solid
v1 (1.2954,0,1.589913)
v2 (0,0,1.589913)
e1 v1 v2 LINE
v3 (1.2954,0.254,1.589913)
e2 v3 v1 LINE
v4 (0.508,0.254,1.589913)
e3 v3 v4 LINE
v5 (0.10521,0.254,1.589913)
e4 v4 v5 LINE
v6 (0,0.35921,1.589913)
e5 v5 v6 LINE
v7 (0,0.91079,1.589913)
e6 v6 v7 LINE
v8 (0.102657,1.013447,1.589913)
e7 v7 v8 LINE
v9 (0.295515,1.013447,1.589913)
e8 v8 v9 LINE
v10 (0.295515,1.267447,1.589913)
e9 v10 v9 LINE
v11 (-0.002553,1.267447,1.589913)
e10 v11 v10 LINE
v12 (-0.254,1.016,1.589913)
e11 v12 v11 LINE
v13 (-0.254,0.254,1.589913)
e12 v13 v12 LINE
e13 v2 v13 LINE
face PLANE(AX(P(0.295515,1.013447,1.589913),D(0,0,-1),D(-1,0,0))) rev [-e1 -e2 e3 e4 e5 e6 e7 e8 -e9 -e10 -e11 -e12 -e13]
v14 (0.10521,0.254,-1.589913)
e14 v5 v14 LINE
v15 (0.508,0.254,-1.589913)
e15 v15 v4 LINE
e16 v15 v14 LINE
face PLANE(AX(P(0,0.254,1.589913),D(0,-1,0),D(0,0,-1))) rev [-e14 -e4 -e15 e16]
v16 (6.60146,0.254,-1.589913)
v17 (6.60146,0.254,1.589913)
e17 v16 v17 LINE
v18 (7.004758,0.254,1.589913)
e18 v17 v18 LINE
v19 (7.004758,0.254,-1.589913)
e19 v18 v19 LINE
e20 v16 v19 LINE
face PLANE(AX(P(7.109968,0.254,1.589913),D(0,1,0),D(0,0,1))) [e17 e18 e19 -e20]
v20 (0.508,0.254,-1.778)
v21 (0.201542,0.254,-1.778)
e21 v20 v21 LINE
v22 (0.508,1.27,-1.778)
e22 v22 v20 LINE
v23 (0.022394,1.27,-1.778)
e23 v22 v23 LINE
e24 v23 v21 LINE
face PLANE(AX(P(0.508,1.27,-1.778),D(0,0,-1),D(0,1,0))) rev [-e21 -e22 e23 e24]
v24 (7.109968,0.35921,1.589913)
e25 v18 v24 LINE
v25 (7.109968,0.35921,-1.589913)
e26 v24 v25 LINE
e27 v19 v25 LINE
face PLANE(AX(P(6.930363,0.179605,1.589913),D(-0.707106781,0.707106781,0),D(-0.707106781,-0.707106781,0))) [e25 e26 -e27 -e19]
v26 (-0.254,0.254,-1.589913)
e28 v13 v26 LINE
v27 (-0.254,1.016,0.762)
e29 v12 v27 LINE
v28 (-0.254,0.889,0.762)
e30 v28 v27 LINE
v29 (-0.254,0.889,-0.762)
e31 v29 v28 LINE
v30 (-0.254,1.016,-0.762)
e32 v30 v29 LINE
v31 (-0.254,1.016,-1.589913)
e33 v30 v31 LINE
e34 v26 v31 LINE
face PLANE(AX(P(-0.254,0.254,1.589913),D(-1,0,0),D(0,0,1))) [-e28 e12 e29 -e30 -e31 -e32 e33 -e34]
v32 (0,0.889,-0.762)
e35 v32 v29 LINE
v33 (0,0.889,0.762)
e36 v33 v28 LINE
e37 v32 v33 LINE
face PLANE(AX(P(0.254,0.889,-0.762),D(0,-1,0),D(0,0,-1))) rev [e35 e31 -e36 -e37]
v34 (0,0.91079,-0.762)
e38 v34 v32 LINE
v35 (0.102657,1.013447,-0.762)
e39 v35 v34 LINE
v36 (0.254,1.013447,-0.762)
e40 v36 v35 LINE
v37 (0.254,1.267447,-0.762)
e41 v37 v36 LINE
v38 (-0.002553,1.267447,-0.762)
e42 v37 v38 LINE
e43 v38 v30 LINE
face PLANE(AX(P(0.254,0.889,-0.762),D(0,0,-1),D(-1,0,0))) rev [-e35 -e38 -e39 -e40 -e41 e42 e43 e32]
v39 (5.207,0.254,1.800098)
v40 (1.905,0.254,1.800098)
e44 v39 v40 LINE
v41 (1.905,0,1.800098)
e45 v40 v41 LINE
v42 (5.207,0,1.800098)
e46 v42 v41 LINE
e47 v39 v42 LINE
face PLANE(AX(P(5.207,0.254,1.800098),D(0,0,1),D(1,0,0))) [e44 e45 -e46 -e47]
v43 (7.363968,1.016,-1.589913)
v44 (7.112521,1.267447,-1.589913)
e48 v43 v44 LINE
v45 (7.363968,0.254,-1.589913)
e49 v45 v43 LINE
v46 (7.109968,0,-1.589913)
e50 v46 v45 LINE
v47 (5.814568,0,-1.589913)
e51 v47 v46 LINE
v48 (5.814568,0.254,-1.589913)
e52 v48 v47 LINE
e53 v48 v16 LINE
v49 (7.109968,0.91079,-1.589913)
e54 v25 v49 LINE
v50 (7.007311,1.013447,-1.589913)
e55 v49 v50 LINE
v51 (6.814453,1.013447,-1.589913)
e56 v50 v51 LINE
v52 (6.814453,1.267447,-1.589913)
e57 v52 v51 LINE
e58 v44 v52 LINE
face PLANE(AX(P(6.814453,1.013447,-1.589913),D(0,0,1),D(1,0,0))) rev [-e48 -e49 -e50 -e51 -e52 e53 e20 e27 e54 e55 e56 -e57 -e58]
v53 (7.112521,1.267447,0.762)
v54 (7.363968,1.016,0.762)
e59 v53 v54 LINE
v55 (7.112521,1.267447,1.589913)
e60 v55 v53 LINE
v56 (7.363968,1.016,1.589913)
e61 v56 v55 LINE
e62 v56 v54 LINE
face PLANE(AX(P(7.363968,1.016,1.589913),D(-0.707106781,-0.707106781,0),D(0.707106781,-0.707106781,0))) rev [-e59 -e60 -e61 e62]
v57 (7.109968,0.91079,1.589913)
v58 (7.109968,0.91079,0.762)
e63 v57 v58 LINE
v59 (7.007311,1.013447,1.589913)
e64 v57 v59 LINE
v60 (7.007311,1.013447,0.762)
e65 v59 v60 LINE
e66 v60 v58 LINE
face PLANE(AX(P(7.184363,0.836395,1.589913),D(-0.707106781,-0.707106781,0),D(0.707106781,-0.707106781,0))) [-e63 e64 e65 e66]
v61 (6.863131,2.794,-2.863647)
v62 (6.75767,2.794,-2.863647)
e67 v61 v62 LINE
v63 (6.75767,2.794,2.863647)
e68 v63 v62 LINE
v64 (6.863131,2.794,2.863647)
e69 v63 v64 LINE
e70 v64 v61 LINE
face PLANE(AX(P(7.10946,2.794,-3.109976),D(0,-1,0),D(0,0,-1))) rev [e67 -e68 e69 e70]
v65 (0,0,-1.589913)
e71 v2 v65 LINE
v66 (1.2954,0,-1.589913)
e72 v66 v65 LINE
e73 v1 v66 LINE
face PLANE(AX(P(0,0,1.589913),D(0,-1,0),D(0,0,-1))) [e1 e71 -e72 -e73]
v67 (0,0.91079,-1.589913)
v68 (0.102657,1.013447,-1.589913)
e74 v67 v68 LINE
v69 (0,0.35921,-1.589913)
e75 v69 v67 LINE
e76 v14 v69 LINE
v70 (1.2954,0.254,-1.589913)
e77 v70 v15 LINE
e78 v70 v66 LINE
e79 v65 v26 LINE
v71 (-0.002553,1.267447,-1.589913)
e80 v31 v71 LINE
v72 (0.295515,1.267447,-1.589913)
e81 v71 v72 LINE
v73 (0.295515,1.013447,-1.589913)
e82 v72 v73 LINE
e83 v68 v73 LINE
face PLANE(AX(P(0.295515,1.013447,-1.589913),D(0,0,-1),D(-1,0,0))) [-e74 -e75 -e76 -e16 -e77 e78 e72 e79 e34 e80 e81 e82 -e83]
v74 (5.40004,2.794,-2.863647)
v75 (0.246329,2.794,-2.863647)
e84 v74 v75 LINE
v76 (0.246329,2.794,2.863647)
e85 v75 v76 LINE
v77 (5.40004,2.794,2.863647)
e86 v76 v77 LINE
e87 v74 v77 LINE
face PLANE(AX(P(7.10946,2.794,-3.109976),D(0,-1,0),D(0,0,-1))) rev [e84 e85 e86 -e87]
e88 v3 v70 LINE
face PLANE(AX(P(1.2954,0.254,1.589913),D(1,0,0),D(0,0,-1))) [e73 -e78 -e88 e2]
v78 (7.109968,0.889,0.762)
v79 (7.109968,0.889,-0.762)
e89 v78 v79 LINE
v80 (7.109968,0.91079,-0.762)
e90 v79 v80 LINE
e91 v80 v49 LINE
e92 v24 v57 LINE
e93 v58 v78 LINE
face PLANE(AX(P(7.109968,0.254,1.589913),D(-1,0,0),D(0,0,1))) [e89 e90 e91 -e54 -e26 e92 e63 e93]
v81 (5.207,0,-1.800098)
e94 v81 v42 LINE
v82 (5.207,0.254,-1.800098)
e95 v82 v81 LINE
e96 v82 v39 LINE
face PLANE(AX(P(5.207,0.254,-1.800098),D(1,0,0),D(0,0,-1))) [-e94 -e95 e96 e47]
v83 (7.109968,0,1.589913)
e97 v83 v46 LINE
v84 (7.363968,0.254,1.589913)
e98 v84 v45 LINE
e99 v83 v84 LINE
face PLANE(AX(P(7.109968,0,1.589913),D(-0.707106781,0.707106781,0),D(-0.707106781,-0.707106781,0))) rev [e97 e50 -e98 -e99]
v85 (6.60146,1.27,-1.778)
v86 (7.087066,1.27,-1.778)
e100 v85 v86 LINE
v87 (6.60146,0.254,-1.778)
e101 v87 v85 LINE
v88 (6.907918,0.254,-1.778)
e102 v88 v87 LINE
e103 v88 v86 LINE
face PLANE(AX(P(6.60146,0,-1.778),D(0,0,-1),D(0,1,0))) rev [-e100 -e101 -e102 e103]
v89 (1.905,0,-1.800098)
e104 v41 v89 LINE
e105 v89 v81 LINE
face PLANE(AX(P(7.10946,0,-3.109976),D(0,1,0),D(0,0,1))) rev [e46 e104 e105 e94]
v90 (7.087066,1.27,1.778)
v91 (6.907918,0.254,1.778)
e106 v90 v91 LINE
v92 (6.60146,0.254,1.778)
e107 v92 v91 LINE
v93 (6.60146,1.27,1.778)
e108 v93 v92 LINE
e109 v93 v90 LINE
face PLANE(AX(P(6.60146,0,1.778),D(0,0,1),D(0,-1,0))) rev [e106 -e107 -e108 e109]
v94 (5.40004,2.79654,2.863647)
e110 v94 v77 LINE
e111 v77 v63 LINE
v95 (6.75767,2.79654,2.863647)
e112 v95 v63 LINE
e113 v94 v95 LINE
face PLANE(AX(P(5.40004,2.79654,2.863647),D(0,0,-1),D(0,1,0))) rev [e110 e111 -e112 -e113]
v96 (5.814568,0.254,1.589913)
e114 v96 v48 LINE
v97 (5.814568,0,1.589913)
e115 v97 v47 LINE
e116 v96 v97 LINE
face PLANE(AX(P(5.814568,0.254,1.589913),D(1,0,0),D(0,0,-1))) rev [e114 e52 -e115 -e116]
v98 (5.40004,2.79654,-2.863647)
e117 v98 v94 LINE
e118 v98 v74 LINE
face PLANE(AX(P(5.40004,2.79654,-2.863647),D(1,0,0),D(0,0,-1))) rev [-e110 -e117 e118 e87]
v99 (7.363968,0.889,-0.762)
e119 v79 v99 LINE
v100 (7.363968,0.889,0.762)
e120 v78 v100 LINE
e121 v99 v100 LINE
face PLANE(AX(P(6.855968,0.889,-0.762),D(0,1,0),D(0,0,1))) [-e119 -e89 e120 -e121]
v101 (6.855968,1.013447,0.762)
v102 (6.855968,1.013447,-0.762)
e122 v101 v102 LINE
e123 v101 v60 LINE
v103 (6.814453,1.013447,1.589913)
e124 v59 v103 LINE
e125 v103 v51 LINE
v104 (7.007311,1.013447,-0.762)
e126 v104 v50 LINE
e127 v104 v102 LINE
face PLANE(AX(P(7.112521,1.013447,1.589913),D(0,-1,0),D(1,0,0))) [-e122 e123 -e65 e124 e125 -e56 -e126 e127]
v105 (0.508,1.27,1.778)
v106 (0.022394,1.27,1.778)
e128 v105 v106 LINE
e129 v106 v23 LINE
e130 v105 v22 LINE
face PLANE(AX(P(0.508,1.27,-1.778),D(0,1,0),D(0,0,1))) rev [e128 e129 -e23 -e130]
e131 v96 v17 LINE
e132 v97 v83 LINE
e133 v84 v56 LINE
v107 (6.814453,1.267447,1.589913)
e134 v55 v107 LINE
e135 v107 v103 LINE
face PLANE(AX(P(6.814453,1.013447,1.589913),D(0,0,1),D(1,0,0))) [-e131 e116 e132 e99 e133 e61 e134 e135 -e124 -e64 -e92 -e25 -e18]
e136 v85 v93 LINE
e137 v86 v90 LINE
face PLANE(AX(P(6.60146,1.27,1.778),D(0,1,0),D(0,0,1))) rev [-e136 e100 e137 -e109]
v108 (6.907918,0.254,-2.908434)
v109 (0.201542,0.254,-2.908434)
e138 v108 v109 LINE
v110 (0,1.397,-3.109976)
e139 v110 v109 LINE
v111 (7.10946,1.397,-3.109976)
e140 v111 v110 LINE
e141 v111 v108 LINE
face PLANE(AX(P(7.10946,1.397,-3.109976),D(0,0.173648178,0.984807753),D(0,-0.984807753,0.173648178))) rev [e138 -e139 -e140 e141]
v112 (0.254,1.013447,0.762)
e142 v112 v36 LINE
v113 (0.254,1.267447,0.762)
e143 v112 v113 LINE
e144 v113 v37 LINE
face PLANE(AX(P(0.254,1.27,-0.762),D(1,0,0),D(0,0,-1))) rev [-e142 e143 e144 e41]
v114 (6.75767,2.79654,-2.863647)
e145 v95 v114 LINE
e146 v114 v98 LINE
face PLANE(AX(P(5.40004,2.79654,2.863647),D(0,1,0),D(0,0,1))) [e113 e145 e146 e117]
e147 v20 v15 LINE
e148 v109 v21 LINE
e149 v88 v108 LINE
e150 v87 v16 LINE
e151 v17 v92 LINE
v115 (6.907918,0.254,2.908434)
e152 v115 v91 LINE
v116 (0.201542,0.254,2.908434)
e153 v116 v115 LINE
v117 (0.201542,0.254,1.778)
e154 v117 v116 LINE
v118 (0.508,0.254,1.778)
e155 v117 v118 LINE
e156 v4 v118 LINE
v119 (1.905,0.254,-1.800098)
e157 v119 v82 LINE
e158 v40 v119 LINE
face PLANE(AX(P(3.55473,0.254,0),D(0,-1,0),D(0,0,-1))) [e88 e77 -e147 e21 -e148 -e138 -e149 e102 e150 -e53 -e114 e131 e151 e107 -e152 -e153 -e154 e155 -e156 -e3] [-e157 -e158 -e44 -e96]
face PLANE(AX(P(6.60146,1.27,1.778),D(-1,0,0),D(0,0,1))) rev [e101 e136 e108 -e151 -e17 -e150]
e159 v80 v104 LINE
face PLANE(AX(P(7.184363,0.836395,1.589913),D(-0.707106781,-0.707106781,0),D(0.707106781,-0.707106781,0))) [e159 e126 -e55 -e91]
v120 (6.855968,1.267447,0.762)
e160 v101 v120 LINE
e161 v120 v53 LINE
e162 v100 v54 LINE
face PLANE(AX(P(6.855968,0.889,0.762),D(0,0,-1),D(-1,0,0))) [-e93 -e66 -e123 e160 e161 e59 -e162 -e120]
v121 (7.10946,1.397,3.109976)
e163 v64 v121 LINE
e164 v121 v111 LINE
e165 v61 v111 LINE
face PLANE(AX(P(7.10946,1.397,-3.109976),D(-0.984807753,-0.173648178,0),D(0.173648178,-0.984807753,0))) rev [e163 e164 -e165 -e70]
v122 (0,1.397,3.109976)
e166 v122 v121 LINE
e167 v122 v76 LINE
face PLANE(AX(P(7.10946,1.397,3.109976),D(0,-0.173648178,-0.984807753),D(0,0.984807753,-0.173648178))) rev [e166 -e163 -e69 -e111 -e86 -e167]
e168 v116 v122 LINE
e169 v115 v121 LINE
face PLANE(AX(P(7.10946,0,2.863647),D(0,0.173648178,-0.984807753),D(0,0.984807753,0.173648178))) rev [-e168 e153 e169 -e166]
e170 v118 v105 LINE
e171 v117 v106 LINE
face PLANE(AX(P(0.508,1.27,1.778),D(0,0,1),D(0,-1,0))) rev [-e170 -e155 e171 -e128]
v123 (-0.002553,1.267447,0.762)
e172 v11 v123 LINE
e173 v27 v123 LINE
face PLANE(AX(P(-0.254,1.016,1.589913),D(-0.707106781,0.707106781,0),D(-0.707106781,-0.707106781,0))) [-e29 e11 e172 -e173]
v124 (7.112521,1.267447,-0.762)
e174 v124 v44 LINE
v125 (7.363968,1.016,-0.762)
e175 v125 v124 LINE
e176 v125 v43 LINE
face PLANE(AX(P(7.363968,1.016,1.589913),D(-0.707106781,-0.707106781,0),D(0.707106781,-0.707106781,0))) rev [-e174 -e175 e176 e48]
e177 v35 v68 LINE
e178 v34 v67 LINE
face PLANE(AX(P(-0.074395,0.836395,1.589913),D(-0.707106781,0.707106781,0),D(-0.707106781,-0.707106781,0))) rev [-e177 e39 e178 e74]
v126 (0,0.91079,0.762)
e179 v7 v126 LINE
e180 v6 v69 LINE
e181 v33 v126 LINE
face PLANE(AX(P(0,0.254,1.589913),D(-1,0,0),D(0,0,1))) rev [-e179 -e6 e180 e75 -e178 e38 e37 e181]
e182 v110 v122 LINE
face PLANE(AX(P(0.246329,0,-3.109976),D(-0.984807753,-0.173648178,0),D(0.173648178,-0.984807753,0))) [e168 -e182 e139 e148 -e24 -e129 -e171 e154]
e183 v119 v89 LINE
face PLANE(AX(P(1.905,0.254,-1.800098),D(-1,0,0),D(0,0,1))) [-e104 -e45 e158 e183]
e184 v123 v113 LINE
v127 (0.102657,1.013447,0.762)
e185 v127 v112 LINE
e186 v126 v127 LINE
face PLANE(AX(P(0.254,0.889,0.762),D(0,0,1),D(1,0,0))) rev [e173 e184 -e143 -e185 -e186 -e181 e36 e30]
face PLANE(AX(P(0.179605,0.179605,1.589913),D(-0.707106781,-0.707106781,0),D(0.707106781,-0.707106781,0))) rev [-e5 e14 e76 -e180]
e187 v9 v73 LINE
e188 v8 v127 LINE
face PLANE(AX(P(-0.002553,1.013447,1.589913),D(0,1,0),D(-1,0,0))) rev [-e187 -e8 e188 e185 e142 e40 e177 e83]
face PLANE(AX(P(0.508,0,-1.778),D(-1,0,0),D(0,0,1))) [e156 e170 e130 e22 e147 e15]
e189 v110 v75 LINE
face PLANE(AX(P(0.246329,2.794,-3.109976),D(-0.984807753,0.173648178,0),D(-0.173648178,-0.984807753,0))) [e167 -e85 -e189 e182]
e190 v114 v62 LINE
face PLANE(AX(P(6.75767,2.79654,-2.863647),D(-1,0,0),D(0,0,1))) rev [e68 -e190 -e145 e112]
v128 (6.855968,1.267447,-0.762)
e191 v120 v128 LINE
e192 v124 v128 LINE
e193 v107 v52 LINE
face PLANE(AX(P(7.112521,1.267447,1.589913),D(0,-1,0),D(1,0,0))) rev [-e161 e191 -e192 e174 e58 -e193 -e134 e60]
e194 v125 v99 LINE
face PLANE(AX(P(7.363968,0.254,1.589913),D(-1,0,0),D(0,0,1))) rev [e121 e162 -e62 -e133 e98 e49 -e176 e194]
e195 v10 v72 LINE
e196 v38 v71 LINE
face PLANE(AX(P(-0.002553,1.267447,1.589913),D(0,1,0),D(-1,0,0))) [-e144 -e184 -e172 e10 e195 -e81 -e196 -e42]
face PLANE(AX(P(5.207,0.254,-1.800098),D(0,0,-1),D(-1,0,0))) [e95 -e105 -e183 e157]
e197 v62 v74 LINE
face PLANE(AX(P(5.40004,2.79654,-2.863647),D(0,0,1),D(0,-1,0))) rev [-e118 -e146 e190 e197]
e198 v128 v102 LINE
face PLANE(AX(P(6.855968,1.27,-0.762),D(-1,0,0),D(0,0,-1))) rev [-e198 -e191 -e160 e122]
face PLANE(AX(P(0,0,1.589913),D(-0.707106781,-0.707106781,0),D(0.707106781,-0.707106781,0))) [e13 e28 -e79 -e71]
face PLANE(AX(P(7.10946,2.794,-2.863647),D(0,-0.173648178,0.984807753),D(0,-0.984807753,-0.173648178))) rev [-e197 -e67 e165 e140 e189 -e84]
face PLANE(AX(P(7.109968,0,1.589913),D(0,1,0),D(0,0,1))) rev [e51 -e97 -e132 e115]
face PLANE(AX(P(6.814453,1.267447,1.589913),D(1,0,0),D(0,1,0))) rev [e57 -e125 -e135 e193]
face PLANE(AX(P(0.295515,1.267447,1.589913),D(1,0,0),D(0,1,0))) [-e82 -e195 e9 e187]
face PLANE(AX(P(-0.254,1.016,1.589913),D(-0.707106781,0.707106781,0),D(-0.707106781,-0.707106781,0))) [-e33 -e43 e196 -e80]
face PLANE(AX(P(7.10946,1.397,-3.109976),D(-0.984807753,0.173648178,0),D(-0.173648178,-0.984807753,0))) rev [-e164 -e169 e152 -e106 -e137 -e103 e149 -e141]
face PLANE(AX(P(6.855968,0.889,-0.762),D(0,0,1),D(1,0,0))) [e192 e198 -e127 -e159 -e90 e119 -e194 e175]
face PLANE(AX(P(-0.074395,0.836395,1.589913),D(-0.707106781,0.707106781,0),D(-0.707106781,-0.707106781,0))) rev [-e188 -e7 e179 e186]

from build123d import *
from OCP.BRepFilletAPI import BRepFilletAPI_MakeChamfer

# Parameters (mm, degrees)
SKETCH2_W                = 6.219952
SKETCH2_H                = 2.794
BASE_EXTRUDE_DEPTH       = 7.10946
CHAMFER1_SIZE            = 1.397
CHAMFER1_SIZE2           = 0.246328792
SKETCH3_W                = 3.556
SKETCH3_H                = 1.27
CUT_EXTRUDE1_DEPTH       = 0.508
SKETCH4_W                = 3.556
SKETCH4_H                = 1.27
CUT_EXTRUDE2_DEPTH       = 0.508
SKETCH5_OUTSIDE_W        = 11.079
SKETCH5_OUTSIDE_H        = 10.19
SKETCH5_OUTSIDE_W_2      = 3.302
SKETCH5_OUTSIDE_H_2      = 3.600196
CUT_EXTRUDE3_DEPTH       = 0.254
CHAMFER2_SIZE            = 1.397
CHAMFER2_SIZE_2          = 0.246328792
BOSS_EXTRUDE_THIN1_DEPTH = 1.589913
SKETCH7_W                = 1.524
SKETCH7_H                = 0.381
CUT_EXTRUDE4_DEPTH       = 0.508
SKETCH8_W                = 1.35763
SKETCH8_H                = 5.727294416
BOSS_EXTRUDE2_DEPTH      = 0.00254


with BuildPart() as part:
    # Sketch2 → Base-Extrude (new body)
    with BuildSketch(Plane(origin=(0, 0, 0), x_dir=(0, 0, -1), z_dir=(1, 0, 0))):
        with Locations((0, 1.397)):
            Rectangle(SKETCH2_W, SKETCH2_H)
    extrude(amount=BASE_EXTRUDE_DEPTH)

    # Chamfer1: one chamfer whose edges measure the first distance from different faces: ONE call of the kernel's chamfer builder (chamfer() names one face for all edges)
    chamfer1_edges_1 = [part.edges().sort_by_distance(p)[0] for p in [
        (7.10946, 0, 0),
    ]]
    chamfer1_side_1 = [part.faces().sort_by_distance(p)[0] for p in [
        (7.10946, 1.397, 0),
    ]]
    chamfer1_edges_2 = [part.edges().sort_by_distance(p)[0] for p in [
        (0, 0, 0),
    ]]
    chamfer1_side_2 = [part.faces().sort_by_distance(p)[0] for p in [
        (0, 1.397, 0),
    ]]
    chamfer1_edges_3 = [part.edges().sort_by_distance(p)[0] for p in [
        (3.55473, 0, -3.109976),
    ]]
    chamfer1_side_3 = [part.faces().sort_by_distance(p)[0] for p in [
        (3.55473, 1.397, -3.109976),
    ]]
    chamfer1_edges_4 = [part.edges().sort_by_distance(p)[0] for p in [
        (3.55473, 0, 3.109976),
    ]]
    chamfer1_side_4 = [part.faces().sort_by_distance(p)[0] for p in [
        (3.55473, 1.397, 3.109976),
    ]]
    chamfer1 = BRepFilletAPI_MakeChamfer(part.part.solid().wrapped)
    for e in chamfer1_edges_1:
        chamfer1.Add(CHAMFER1_SIZE, CHAMFER1_SIZE2, e.wrapped, chamfer1_side_1[0].wrapped)  # the first distance lies on this face
    for e in chamfer1_edges_2:
        chamfer1.Add(CHAMFER1_SIZE, CHAMFER1_SIZE2, e.wrapped, chamfer1_side_2[0].wrapped)  # the first distance lies on this face
    for e in chamfer1_edges_3:
        chamfer1.Add(CHAMFER1_SIZE, CHAMFER1_SIZE2, e.wrapped, chamfer1_side_3[0].wrapped)  # the first distance lies on this face
    for e in chamfer1_edges_4:
        chamfer1.Add(CHAMFER1_SIZE, CHAMFER1_SIZE2, e.wrapped, chamfer1_side_4[0].wrapped)  # the first distance lies on this face
    add(Compound.cast(chamfer1.Shape()), mode=Mode.REPLACE)

    # Sketch3 → Cut-Extrude1 (cut)
    with BuildSketch(Plane.ZY):
        with Locations((0, 0.635)):
            Rectangle(SKETCH3_W, SKETCH3_H)
    extrude(amount=-CUT_EXTRUDE1_DEPTH, mode=Mode.SUBTRACT)

    # Sketch4 → Cut-Extrude2 (cut)
    with BuildSketch(Plane(origin=(7.10946, 0, 0), x_dir=(0, 0, -1), z_dir=(1, 0, 0))):
        with Locations((0, 0.635)):
            Rectangle(SKETCH4_W, SKETCH4_H)
    extrude(amount=-CUT_EXTRUDE2_DEPTH, mode=Mode.SUBTRACT)

    # Sketch5 outside → Cut-Extrude3 (cut)
    with BuildSketch(Plane.XZ):
        with Locations((3.5545, 0)):
            Rectangle(SKETCH5_OUTSIDE_W, SKETCH5_OUTSIDE_H)
        with Locations((3.556, 0)):
            Rectangle(SKETCH5_OUTSIDE_W_2, SKETCH5_OUTSIDE_H_2, mode=Mode.SUBTRACT)
    extrude(amount=-CUT_EXTRUDE3_DEPTH, mode=Mode.SUBTRACT)

    # Chamfer2
    chamfer2_edges_1 = [part.edges().sort_by_distance(p)[0] for p in [
        (0, 2.794, 0),
    ]]
    chamfer2_side_1 = [part.faces().sort_by_distance(p)[0] for p in [
        (0, 2.789073424, 0),
    ]]
    chamfer2_edges_2 = [part.edges().sort_by_distance(p)[0] for p in [
        (7.10946, 2.794, 0),
    ]]
    chamfer2_side_2 = [part.faces().sort_by_distance(p)[0] for p in [
        (7.104533424, 2.794, 0),
    ]]
    chamfer2_edges_3 = [part.edges().sort_by_distance(p)[0] for p in [
        (3.55473, 2.794, 3.109976),
    ]]
    chamfer2_side_3 = [part.faces().sort_by_distance(p)[0] for p in [
        (3.55473, 2.789073424, 3.109976),
    ]]
    chamfer2_edges_4 = [part.edges().sort_by_distance(p)[0] for p in [
        (3.55473, 2.794, -3.109976),
    ]]
    chamfer2_side_4 = [part.faces().sort_by_distance(p)[0] for p in [
        (3.55473, 2.794, -3.105049424),
    ]]
    chamfer2 = BRepFilletAPI_MakeChamfer(part.part.solid().wrapped)
    for e in chamfer2_edges_1:
        chamfer2.Add(CHAMFER2_SIZE - 0.0001, CHAMFER2_SIZE_2 - 0.0001, e.wrapped, chamfer2_side_1[0].wrapped)
    for e in chamfer2_edges_2:
        chamfer2.Add(CHAMFER2_SIZE_2 - 0.0001, CHAMFER2_SIZE - 0.0001, e.wrapped, chamfer2_side_2[0].wrapped)
    for e in chamfer2_edges_3:
        chamfer2.Add(CHAMFER2_SIZE - 0.0001, CHAMFER2_SIZE_2 - 0.0001, e.wrapped, chamfer2_side_3[0].wrapped)
    for e in chamfer2_edges_4:
        chamfer2.Add(CHAMFER2_SIZE_2 - 0.0001, CHAMFER2_SIZE - 0.0001, e.wrapped, chamfer2_side_4[0].wrapped)
    add(Compound.cast(chamfer2.Shape()), mode=Mode.REPLACE)  # a hair under: the kernel refuses the full size

    # Sketch6 → Boss-Extrude-Thin1 (add, symmetric)
    with BuildSketch(Plane.XY):
        Polygon((0.295515086, 1.267447171), (-0.002552829, 1.267447171), (-0.254, 1.016), (-0.254, 0.254), (0, 0), (1.2954, 0), (1.2954, 0.254), (0.105210245, 0.254), (0, 0.359210245), (0, 0.910789755), (0.102657416, 1.013447171), (0.295515086, 1.013447171), align=None)
    boss_extrude_thin1 = extrude(amount=BOSS_EXTRUDE_THIN1_DEPTH, both=True)

    # Sketch7 → Cut-Extrude4 (cut)
    with BuildSketch(Plane.ZY.offset(0.254)):
        with Locations((0, 1.0795)):
            Rectangle(SKETCH7_W, SKETCH7_H)
    cut_extrude4 = extrude(amount=-CUT_EXTRUDE4_DEPTH, mode=Mode.SUBTRACT)

    # Mirror1: Boss-Extrude-Thin1, Cut-Extrude4 across plane
    add(boss_extrude_thin1.mirror(Plane(origin=(3.554984, 0, 0), x_dir=(0, 0, 1), z_dir=(1, 0, 0))))
    add(cut_extrude4.mirror(Plane(origin=(3.554984, 0, 0), x_dir=(0, 0, 1), z_dir=(1, 0, 0))), mode=Mode.SUBTRACT)

    # Sketch8 → Boss-Extrude2 (add)
    with BuildSketch(Plane(origin=(0, 2.794, 0), x_dir=(-1, 0, 0), z_dir=(0, 1, 0))):
        with Locations((-6.078855, 0)):
            Rectangle(SKETCH8_W, SKETCH8_H)
    extrude(amount=BOSS_EXTRUDE2_DEPTH)


solid = part.part
